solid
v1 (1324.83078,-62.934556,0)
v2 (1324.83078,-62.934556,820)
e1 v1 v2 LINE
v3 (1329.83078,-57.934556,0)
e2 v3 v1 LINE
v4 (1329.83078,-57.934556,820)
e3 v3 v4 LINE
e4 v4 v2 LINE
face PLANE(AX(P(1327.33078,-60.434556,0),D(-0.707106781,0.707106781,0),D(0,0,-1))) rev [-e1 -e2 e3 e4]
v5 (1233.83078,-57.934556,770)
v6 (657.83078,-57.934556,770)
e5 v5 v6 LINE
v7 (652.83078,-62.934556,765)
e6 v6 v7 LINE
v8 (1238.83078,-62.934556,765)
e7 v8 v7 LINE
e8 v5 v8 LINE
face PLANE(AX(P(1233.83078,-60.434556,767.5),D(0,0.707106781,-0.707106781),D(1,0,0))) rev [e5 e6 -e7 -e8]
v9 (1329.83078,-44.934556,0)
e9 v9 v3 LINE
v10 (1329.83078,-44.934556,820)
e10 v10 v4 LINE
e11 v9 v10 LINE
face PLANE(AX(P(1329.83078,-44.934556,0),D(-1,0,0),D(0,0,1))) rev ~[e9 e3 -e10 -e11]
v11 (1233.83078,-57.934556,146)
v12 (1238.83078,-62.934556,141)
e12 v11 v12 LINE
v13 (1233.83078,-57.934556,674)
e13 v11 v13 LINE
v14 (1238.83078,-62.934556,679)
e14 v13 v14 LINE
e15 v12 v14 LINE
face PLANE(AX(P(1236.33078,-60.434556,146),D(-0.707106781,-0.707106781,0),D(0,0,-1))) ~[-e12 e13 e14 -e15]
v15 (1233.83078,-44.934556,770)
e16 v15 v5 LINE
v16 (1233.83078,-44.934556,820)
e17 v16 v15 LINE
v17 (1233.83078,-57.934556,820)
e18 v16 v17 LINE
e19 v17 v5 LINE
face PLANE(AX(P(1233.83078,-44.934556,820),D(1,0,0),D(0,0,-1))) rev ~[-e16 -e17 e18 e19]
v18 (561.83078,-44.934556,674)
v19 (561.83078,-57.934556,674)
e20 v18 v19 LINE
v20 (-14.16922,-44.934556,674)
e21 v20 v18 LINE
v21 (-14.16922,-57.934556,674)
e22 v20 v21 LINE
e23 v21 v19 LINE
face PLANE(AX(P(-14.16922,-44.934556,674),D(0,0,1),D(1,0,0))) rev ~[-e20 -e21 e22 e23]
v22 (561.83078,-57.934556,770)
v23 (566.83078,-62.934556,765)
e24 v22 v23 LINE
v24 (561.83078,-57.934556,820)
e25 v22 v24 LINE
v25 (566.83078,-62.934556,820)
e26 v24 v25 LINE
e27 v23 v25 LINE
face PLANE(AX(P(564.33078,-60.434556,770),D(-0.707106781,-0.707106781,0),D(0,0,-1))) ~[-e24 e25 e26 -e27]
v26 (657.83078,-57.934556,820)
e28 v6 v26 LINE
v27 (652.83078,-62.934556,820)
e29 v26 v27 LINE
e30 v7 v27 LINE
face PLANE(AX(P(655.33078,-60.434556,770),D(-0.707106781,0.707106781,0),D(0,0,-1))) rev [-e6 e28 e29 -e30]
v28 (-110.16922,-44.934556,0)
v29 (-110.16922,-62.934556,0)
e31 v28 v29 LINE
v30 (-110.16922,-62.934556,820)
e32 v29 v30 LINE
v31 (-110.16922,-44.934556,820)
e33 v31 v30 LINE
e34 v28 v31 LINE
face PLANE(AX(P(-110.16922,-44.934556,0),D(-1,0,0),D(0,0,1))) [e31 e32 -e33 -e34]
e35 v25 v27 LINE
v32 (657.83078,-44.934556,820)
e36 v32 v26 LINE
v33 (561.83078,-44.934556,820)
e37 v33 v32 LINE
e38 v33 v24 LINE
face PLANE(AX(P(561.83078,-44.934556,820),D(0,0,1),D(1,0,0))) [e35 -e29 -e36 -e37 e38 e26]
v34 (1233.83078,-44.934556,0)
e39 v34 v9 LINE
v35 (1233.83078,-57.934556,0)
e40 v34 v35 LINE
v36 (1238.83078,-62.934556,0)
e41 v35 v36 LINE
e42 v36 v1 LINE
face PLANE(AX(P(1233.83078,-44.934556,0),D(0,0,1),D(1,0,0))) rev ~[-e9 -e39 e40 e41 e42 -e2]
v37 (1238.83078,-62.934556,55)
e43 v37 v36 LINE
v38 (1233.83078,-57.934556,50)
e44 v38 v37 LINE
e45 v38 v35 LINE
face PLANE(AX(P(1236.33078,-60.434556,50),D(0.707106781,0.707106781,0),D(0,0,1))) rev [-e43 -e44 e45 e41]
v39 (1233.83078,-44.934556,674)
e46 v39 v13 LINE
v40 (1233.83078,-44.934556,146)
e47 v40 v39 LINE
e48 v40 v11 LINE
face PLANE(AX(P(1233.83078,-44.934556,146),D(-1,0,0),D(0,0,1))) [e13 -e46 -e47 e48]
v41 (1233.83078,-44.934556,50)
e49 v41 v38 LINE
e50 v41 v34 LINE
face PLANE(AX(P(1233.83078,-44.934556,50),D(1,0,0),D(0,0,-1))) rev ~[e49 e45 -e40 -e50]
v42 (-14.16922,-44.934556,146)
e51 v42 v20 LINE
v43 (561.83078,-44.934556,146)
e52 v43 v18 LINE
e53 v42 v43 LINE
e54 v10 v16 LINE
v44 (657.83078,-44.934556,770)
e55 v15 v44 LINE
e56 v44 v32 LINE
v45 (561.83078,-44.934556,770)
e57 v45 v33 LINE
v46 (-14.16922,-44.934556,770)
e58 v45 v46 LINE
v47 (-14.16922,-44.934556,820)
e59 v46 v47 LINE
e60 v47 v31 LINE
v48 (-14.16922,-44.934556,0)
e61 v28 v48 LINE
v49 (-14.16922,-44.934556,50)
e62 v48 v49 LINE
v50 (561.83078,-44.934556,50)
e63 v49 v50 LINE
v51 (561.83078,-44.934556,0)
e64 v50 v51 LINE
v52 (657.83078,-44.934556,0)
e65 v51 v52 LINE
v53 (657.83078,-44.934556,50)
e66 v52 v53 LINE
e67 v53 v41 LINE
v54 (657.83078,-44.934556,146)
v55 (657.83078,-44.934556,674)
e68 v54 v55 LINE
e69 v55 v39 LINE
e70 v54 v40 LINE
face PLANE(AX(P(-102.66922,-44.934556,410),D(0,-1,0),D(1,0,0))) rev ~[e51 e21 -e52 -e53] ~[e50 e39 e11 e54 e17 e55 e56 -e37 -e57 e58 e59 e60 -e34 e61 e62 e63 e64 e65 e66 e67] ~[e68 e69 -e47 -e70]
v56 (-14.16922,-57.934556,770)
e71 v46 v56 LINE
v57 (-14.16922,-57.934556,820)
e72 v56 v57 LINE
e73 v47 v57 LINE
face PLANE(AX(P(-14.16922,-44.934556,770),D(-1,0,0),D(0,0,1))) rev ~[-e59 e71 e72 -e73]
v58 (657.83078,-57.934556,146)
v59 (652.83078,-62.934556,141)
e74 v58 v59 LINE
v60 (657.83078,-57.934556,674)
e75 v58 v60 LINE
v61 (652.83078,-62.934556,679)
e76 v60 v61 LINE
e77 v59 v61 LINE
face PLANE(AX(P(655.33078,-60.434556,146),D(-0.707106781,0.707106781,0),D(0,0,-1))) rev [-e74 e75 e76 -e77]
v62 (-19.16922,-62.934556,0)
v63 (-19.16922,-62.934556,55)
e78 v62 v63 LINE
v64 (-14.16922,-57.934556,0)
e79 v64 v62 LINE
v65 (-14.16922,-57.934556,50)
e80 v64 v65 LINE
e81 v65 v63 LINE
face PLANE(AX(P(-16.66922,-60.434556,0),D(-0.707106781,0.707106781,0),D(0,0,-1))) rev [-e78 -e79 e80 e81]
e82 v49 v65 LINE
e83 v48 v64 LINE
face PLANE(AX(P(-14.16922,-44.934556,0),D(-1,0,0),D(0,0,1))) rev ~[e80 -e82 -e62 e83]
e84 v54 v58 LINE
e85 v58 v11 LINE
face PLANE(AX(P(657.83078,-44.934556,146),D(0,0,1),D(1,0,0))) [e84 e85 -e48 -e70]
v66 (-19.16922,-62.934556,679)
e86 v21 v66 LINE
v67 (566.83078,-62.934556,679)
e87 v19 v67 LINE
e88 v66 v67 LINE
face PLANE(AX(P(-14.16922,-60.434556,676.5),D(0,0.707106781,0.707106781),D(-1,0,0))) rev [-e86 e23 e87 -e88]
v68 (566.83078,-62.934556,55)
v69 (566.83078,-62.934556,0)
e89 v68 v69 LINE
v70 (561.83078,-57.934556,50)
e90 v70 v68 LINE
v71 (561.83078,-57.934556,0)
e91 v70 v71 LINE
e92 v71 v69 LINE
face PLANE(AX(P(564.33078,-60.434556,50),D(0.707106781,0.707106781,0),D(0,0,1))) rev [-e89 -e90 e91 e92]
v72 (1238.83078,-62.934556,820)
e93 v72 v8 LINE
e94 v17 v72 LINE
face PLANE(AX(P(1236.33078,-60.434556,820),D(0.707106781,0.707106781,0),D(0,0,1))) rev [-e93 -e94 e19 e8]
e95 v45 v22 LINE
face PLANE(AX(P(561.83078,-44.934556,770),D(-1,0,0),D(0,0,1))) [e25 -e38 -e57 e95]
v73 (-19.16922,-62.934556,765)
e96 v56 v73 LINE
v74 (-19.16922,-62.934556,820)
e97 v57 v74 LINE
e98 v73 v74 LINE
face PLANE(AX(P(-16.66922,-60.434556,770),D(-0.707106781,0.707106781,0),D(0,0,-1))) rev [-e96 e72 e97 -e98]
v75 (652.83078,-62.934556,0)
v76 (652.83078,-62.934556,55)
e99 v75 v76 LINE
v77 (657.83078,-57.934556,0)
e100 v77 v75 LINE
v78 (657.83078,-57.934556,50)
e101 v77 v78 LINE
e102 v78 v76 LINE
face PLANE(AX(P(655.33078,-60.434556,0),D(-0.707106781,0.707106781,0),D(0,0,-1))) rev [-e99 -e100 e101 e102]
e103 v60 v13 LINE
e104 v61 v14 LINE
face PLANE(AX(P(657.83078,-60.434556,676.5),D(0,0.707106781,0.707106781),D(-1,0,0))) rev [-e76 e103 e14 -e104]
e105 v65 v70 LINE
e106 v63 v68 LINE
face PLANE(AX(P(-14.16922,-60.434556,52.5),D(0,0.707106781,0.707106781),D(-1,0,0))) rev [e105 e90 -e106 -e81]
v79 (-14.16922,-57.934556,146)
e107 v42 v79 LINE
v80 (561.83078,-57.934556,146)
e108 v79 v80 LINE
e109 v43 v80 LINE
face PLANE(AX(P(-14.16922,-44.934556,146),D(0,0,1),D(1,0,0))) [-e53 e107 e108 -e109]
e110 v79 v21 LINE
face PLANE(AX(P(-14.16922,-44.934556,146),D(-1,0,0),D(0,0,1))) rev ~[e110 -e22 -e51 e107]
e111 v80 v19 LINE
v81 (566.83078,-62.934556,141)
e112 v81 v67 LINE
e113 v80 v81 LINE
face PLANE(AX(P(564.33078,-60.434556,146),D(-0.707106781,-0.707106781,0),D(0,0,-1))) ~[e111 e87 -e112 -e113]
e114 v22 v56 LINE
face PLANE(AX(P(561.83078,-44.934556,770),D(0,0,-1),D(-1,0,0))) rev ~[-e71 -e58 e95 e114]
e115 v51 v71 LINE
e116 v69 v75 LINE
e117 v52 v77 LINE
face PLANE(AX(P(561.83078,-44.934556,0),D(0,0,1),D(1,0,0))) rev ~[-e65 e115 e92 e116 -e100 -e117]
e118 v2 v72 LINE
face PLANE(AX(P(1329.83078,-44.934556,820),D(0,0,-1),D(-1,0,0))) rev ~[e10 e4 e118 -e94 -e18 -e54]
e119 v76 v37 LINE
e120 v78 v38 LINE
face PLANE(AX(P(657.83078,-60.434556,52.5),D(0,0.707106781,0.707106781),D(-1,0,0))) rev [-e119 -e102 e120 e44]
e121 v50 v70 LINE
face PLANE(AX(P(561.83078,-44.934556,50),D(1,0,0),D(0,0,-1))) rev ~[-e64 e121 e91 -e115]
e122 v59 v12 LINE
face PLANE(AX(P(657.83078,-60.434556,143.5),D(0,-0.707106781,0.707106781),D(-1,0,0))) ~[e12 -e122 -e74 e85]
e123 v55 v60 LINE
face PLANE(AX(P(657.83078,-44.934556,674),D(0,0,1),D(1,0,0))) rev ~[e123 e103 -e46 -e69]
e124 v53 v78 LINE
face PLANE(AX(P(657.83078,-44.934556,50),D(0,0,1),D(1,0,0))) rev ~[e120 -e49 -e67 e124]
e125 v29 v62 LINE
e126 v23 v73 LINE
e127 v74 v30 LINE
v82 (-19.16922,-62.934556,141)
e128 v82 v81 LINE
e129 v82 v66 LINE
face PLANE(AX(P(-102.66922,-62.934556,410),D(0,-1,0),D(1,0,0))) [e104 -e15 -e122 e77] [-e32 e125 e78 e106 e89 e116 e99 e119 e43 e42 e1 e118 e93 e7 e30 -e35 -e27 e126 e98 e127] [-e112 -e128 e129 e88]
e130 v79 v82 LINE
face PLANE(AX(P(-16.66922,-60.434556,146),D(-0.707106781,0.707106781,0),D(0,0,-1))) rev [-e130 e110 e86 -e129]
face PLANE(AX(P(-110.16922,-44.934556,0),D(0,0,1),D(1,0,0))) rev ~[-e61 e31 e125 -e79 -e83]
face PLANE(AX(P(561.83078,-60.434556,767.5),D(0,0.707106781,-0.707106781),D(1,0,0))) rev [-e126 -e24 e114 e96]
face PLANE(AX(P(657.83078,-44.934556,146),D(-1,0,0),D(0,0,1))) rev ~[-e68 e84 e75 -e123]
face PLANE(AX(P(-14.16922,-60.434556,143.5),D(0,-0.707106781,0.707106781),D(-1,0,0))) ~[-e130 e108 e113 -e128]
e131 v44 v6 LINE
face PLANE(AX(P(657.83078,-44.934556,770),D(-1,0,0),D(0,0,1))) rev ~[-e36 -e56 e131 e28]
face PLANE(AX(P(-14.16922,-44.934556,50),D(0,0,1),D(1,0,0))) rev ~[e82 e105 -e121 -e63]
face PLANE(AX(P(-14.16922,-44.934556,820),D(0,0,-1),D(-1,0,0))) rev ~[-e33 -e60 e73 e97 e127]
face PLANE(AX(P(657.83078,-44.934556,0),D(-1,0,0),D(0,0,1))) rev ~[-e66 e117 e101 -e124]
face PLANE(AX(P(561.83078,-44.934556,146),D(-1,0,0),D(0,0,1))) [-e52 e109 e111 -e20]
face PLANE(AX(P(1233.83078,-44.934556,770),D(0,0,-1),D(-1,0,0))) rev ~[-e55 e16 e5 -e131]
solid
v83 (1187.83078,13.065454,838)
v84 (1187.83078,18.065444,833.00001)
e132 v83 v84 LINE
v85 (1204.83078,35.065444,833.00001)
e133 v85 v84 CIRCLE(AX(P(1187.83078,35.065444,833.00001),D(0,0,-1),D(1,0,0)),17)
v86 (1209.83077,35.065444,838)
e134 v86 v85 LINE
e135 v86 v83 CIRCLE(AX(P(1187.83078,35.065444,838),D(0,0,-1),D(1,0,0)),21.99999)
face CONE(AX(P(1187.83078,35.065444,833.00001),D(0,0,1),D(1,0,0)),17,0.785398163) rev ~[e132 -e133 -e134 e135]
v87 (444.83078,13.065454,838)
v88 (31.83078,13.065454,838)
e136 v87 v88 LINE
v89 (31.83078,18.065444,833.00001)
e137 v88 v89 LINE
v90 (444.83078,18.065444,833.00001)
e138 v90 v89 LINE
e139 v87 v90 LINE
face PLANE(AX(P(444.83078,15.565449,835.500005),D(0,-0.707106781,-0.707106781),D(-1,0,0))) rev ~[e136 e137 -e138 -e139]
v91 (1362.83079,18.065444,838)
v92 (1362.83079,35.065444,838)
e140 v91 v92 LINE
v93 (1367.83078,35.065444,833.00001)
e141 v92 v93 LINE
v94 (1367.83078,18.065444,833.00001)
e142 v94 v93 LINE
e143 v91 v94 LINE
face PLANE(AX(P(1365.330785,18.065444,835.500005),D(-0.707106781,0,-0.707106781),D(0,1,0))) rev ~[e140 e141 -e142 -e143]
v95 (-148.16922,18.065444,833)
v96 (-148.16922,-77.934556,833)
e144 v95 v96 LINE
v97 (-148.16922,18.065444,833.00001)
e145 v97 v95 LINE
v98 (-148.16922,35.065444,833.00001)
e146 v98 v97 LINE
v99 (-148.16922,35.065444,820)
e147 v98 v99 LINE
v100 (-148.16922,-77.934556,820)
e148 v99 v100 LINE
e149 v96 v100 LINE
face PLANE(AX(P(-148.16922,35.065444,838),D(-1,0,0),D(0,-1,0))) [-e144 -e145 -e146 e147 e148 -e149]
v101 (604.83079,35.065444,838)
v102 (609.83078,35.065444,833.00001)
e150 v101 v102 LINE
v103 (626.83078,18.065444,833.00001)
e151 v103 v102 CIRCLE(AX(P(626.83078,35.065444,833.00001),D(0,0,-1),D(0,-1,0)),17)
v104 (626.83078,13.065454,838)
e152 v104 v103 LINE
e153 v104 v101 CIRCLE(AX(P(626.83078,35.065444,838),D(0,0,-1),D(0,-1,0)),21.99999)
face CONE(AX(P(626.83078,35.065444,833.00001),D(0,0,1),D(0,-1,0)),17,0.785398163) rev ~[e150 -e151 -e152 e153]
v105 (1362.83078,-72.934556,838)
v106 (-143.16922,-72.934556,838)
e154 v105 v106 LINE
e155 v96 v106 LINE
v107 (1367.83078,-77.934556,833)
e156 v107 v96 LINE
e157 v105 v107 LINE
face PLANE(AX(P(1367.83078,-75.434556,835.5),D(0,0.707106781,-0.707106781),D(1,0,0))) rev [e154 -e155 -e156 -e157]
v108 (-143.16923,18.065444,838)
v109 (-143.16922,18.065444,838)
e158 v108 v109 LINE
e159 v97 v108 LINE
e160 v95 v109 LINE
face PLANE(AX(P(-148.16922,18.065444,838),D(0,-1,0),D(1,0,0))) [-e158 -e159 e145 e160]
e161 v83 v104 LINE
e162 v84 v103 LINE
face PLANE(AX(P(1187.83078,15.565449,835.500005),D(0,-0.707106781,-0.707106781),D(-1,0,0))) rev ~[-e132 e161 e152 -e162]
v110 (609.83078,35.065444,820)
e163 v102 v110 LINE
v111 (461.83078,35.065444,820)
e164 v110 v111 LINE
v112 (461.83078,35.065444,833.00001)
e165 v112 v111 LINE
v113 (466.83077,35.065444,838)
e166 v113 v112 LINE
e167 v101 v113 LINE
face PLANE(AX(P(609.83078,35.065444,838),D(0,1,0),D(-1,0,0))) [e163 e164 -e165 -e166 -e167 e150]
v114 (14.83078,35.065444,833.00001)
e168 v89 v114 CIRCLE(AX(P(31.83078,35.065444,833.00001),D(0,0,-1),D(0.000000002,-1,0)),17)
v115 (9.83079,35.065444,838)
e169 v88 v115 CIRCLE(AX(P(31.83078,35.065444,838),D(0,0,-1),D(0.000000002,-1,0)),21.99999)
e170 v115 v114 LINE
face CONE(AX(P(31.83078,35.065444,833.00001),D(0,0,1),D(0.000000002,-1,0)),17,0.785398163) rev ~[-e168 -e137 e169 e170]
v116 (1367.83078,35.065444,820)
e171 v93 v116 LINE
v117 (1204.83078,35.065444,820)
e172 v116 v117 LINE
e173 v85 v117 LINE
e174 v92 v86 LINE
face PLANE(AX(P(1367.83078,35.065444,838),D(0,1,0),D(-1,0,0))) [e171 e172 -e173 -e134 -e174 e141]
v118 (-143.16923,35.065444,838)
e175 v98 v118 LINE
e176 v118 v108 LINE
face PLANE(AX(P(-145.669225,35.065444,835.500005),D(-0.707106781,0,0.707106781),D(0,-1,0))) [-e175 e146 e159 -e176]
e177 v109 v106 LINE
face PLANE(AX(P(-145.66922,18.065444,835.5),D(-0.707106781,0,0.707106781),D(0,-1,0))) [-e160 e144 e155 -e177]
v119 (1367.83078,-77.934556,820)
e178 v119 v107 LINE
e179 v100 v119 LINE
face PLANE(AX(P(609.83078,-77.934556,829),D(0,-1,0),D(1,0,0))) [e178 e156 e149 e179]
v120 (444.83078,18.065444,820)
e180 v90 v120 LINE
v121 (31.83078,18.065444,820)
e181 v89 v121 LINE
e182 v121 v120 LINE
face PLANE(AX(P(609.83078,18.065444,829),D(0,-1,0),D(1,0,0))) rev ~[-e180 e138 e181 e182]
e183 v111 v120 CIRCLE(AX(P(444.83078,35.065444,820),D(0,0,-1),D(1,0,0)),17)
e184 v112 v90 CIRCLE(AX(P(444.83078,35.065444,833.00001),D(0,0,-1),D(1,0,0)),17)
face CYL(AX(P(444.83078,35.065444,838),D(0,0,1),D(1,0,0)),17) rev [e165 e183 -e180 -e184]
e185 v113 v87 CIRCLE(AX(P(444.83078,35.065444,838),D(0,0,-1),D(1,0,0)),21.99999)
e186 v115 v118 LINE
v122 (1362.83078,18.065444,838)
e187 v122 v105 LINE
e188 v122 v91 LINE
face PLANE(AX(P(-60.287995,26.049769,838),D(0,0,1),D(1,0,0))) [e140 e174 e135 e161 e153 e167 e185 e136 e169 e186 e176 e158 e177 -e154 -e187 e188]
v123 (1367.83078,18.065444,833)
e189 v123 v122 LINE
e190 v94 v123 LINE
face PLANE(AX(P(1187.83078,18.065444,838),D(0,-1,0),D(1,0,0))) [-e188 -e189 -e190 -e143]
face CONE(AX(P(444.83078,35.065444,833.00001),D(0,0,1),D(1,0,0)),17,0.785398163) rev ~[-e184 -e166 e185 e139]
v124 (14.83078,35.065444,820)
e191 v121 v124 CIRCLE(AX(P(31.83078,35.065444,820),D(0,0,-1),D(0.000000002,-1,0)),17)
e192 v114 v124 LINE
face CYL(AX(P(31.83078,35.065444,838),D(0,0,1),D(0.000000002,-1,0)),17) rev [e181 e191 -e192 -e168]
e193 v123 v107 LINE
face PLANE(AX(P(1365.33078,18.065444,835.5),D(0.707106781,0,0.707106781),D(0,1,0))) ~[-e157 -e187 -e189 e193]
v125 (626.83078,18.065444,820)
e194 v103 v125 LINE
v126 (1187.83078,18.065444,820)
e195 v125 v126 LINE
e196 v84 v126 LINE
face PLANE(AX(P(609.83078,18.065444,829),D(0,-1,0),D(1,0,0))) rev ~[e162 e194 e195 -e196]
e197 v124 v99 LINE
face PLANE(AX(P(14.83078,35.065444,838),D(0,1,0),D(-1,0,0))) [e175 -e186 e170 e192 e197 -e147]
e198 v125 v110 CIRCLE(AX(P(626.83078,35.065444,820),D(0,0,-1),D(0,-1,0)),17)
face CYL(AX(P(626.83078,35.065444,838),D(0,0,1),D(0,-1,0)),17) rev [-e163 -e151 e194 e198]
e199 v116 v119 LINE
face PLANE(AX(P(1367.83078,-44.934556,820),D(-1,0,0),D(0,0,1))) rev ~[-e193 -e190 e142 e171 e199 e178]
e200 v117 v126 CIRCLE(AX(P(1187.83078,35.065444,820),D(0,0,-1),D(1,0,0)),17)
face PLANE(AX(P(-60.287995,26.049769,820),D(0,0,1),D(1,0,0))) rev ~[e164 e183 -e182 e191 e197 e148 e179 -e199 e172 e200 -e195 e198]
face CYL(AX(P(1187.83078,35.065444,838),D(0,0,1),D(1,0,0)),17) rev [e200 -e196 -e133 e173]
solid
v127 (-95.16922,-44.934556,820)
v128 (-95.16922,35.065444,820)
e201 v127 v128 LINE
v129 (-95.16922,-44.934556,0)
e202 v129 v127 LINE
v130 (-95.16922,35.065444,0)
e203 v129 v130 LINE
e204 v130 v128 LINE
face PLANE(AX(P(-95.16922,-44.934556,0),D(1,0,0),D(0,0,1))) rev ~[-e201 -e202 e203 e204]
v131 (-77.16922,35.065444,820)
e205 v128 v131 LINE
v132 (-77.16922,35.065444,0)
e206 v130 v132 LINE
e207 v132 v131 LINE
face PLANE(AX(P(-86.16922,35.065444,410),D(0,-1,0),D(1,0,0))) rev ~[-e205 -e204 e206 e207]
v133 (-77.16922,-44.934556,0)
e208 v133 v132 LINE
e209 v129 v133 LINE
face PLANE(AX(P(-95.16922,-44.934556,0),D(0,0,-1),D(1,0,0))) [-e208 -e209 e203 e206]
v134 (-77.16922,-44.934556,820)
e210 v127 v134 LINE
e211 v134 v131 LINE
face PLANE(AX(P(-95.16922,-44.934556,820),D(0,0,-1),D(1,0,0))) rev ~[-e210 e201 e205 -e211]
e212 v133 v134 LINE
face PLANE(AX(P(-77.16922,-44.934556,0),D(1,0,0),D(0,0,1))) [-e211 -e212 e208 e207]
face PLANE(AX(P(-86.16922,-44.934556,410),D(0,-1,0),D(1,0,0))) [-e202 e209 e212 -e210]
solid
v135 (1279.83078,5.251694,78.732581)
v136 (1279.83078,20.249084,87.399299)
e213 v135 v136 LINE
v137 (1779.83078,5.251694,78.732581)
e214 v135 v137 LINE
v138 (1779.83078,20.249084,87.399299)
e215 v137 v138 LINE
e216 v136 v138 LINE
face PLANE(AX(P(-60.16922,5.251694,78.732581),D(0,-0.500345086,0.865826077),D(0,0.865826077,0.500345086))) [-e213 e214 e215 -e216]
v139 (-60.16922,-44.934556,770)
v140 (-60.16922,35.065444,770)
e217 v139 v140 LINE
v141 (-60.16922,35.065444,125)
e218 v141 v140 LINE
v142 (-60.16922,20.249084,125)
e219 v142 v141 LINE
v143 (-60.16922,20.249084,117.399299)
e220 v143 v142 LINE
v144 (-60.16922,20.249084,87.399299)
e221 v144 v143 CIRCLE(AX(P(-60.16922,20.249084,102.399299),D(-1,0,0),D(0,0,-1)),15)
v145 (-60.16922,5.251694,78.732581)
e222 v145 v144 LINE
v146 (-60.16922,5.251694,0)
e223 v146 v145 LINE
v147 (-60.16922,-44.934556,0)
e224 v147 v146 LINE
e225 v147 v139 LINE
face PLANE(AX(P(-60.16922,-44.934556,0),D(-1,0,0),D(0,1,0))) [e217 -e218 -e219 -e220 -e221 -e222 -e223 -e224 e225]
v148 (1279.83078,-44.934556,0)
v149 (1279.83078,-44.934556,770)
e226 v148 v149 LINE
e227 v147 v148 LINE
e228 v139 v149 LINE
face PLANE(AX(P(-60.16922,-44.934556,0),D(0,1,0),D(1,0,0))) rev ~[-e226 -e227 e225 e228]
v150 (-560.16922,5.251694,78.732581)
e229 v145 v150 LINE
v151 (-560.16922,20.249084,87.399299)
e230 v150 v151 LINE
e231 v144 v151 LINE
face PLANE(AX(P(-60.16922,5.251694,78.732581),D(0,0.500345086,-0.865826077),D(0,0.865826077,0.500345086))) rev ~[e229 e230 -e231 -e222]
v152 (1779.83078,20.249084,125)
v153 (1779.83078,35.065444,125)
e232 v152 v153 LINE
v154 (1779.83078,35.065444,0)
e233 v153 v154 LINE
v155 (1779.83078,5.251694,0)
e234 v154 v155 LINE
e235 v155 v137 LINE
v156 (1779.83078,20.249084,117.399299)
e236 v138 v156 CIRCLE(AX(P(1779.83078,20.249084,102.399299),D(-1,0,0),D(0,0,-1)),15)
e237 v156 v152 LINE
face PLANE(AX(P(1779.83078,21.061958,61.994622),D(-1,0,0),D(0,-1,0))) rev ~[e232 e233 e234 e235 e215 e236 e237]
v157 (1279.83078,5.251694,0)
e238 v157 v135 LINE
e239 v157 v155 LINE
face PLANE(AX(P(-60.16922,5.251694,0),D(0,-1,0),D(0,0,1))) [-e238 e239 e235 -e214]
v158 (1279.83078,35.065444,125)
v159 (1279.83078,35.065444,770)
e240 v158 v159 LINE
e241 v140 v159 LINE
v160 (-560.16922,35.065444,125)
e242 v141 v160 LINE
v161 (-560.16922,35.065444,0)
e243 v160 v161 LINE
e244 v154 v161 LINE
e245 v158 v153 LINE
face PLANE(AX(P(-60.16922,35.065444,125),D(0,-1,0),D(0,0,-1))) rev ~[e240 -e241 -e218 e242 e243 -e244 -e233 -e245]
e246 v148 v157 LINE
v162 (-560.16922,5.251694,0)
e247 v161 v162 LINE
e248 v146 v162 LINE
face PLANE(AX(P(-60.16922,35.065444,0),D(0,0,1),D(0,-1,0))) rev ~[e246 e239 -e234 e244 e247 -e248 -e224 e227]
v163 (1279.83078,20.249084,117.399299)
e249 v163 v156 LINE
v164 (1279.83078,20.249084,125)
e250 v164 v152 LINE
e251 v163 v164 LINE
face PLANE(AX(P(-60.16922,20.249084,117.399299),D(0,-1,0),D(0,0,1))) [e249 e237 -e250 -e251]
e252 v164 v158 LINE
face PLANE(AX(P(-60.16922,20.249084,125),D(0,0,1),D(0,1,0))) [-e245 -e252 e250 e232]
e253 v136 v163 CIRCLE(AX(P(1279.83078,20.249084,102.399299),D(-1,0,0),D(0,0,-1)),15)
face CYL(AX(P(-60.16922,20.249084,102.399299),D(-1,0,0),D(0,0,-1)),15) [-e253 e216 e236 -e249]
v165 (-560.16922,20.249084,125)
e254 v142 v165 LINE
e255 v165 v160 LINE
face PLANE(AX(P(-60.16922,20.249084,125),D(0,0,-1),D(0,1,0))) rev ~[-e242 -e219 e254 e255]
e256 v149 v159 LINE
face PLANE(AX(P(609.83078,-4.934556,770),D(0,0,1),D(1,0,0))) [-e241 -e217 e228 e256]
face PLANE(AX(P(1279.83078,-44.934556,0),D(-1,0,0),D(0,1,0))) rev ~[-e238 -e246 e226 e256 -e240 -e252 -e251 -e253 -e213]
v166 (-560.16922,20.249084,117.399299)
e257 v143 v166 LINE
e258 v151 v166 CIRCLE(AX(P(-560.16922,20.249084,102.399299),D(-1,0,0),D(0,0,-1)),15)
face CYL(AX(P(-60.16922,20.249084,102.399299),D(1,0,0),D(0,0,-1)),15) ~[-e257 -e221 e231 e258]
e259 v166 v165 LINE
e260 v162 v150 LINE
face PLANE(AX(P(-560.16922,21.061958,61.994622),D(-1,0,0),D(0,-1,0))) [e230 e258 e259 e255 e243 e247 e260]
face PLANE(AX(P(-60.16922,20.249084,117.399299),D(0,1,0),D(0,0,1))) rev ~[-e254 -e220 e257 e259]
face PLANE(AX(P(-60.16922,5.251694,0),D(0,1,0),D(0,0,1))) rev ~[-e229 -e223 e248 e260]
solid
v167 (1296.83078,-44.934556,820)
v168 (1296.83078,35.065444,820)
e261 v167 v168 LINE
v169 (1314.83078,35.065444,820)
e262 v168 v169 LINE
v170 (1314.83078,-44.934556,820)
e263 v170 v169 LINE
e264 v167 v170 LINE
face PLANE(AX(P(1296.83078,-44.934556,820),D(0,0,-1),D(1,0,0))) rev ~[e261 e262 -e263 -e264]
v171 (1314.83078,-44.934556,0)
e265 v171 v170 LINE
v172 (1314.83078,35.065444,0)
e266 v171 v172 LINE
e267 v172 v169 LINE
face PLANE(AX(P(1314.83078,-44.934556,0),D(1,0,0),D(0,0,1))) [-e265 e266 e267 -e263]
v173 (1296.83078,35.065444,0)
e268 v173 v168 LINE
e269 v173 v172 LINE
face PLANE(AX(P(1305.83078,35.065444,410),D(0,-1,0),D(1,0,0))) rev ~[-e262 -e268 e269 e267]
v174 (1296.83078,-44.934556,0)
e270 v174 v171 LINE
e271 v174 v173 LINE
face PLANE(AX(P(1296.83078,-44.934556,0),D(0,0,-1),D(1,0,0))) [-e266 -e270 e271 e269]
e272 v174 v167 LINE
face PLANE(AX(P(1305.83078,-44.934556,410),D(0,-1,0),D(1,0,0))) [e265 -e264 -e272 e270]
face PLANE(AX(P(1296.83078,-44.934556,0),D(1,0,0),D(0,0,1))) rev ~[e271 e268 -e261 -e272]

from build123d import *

# Parameters (mm, degrees)
F0_W          = 1340
F0_H          = 80
F1_DEPTH      = 770
F3_DEPTH      = 500
F3_DEPTH_BACK = 1840
F4_W          = 15
F4_H          = 820
F4_W_2        = 576
F4_H_2        = 528
F4_W_3        = 96
F4_H_3        = 50
F4_W_4        = 18
F5_DEPTH      = 18
F6_SIZE       = 5
F7_DEPTH      = 63
F7_DEPTH_BACK = 33
F8_SIZE       = 5
F9_DEPTH      = 80
F11_DEPTH     = 18
F12_SIZE      = 4.99999


# Not quite as in the source:
# - a fillet or chamfer is up to 0.001 mm smaller than in the source, because OpenCascade refuses the exact size


with BuildPart() as f1:
    # F0 (on Top) → F1 (new body)
    with BuildSketch(Plane.XY):
        with Locations((609.8307800293, -4.9345558882)):
            Rectangle(F0_W, F0_H)
    extrude(amount=F1_DEPTH)

    # F2 (on face) → F3 (join, two sides)
    with BuildSketch(Plane(origin=(-60.1692199707, 0, 0), x_dir=(0, -1, 0), z_dir=(-1, 0, 0))) as f3_sk:
        with BuildLine():
            Line((-35.0654441118, 125), (-35.0654441118, 0))
            Line((-35.0654441118, 0), (-5.2516935417, 0))
            Line((-5.2516935417, 0), (-5.2516935417, 78.7325807151))
            Line((-5.2516935417, 78.7325807151), (-20.2490844093, 87.3992991551))
            ThreePointArc((-20.2490844093, 87.3992991551), (-5.2490844093, 102.3992991551), (-20.2490844093, 117.3992991551))
            Line((-20.2490844093, 117.3992991551), (-20.2490844093, 125))
            Line((-20.2490844093, 125), (-35.0654441118, 125))
        make_face()
    extrude(amount=F3_DEPTH)
    extrude(f3_sk.sketch, amount=-F3_DEPTH_BACK)


with BuildPart() as f5:
    # F4 (on face) → F5 (new body)
    with BuildSketch(Plane.XZ.offset(44.9345558882)):
        with Locations((-102.6692199707, 410)):
            Rectangle(F4_W, F4_H)
        Polygon((657.8307800293, 770), (561.8307800293, 770), (-14.1692199707, 770), (-60.1692199707, 770), (-60.1692199707, 0), (-14.1692199707, 0), (-14.1692199707, 50), (561.8307800293, 50), (561.8307800293, 0), (657.8307800293, 0), (657.8307800293, 50), (1233.8307800293, 50), (1233.8307800293, 0), (1279.8307800293, 0), (1279.8307800293, 770), (1233.8307800293, 770), align=None)
        with Locations((273.8307800293, 410)):
            Rectangle(F4_W_2, F4_H_2, mode=Mode.SUBTRACT)
        with Locations((945.8307800293, 410)):
            Rectangle(F4_W_2, F4_H_2, mode=Mode.SUBTRACT)
        with Locations((609.8307800293, 795)):
            Rectangle(F4_W_3, F4_H_3)
        with Locations((1322.3307800293, 410)):
            Rectangle(F4_W, F4_H)
        Polygon((-14.1692199707, 770), (-14.1692199707, 820), (-77.1692199707, 820), (-77.1692199707, 0), (-60.1692199707, 0), (-60.1692199707, 770), align=None)
        with Locations((-86.1692199707, 410)):
            Rectangle(F4_W_4, F4_H)
        Polygon((1296.8307800293, 820), (1233.8307800293, 820), (1233.8307800293, 770), (1279.8307800293, 770), (1279.8307800293, 0), (1296.8307800293, 0), align=None)
        with Locations((1305.8307800293, 410)):
            Rectangle(F4_W_4, F4_H)
    extrude(amount=F5_DEPTH)

    # F6
    f6_edges = [f5.edges().sort_by_distance(p)[0] for p in [
        (-14.16922, -62.934556, 795),
        (273.83078, -62.934556, 770),
        (561.83078, -62.934556, 795),
        (657.83078, -62.934556, 795),
        (945.83078, -62.934556, 770),
        (1233.83078, -62.934556, 795),
        (1233.83078, -62.934556, 410),
        (945.83078, -62.934556, 674),
        (657.83078, -62.934556, 410),
        (945.83078, -62.934556, 146),
        (561.83078, -62.934556, 410),
        (273.83078, -62.934556, 674),
        (-14.16922, -62.934556, 410),
        (273.83078, -62.934556, 146),
        (-14.16922, -62.934556, 25),
        (273.83078, -62.934556, 50),
        (561.83078, -62.934556, 25),
        (657.83078, -62.934556, 25),
        (945.83078, -62.934556, 50),
        (1233.83078, -62.934556, 25),
        (1329.83078, -62.934556, 410),
    ]]
    chamfer(f6_edges, length=F6_SIZE)


with BuildPart() as f7:
    # F4 (on face) → F7 (new body, two sides)
    with BuildSketch(Plane.XZ.offset(44.9345558882)) as f7_sk:
        Polygon((-14.1692199707, 820), (561.8307800293, 820), (657.8307800293, 820), (1233.8307800293, 820), (1296.8307800293, 820), (1314.8307800293, 820), (1329.8307800293, 820), (1367.8307800293, 820), (1367.8307800293, 838), (-148.1692199707, 838), (-148.1692199707, 820), (-110.1692199707, 820), (-95.1692199707, 820), (-77.1692199707, 820), align=None)
    extrude(amount=-F7_DEPTH)
    extrude(f7_sk.sketch, amount=F7_DEPTH_BACK)

    # F8
    f8_edges = [f7.edges().sort_by_distance(p)[0] for p in [
        (-148.16922, -29.934556, 838),
        (609.83078, -77.934556, 838),
        (1367.83078, -29.934556, 838),
    ]]
    chamfer(f8_edges, length=F8_SIZE)

    # F10 (on face) → F11 (join)
    with BuildSketch(Plane.XY.offset(838)):
        with BuildLine():
            Line((-60.1692199707, 35.0654441118), (-148.1692199707, 35.0654441118))
            Line((-148.1692199707, 35.0654441118), (-148.1692199707, 18.0654441118))
            Line((-148.1692199707, 18.0654441118), (-143.1692199707, 18.0654441118))
            Line((-143.1692199707, 18.0654441118), (31.8307800574, 18.0654441118))
            ThreePointArc((31.8307800574, 18.0654441118), (19.8099647591, 23.0446288217), (14.8307800293, 35.0654441118))
            Line((14.8307800293, 35.0654441118), (-60.1692199707, 35.0654441118))
        make_face()
        with BuildLine():
            ThreePointArc((461.8307800293, 35.0654441118), (456.8515952122, 23.0446287344), (444.8307797541, 18.0654441118))
            Line((444.8307797541, 18.0654441118), (626.8307800293, 18.0654441118))
            ThreePointArc((626.8307800293, 18.0654441118), (614.8099647491, 23.0446288317), (609.8307800293, 35.0654441118))
            Line((609.8307800293, 35.0654441118), (461.8307800293, 35.0654441118))
        make_face()
        with BuildLine():
            Line((1187.8307800293, 18.0654441118), (1362.8307800293, 18.0654441118))
            Line((1362.8307800293, 18.0654441118), (1367.8307800293, 18.0654441118))
            Line((1367.8307800293, 18.0654441118), (1367.8307800293, 35.0654441118))
            Line((1367.8307800293, 35.0654441118), (1279.8307800293, 35.0654441118))
            Line((1279.8307800293, 35.0654441118), (1204.8307800293, 35.0654441118))
            ThreePointArc((1204.8307800293, 35.0654441118), (1199.8515953095, 23.0446288317), (1187.8307800293, 18.0654441118))
        make_face()
    extrude(amount=-F11_DEPTH)

    # F12 (size 5 in the source; OpenCascade refuses exactly that, so slightly less here)
    f12_edges = [f7.edges().sort_by_distance(p)[0] for p in [
        (1367.83078, 26.565444, 838),
        (1199.851595, 23.044629, 838),
        (456.851595, 23.044629, 838),
        (-148.16922, 26.565444, 838),
    ]]
    chamfer(f12_edges, length=F12_SIZE)


with BuildPart() as f9:
    # F4 (on face) → F9 (new body)
    with BuildSketch(Plane.XZ.offset(44.9345558882)):
        with Locations((-86.1692199707, 410)):
            Rectangle(F4_W_4, F4_H)
    extrude(amount=-F9_DEPTH)


with BuildPart() as f9b:
    # F4 (on face) → F9, piece 2 (new body)
    with BuildSketch(Plane.XZ.offset(44.9345558882)):
        with Locations((1305.8307800293, 410)):
            Rectangle(F4_W_4, F4_H)
    extrude(amount=-F9_DEPTH)


solid = Compound([f1.part, f5.part, f7.part, f9.part, f9b.part])
